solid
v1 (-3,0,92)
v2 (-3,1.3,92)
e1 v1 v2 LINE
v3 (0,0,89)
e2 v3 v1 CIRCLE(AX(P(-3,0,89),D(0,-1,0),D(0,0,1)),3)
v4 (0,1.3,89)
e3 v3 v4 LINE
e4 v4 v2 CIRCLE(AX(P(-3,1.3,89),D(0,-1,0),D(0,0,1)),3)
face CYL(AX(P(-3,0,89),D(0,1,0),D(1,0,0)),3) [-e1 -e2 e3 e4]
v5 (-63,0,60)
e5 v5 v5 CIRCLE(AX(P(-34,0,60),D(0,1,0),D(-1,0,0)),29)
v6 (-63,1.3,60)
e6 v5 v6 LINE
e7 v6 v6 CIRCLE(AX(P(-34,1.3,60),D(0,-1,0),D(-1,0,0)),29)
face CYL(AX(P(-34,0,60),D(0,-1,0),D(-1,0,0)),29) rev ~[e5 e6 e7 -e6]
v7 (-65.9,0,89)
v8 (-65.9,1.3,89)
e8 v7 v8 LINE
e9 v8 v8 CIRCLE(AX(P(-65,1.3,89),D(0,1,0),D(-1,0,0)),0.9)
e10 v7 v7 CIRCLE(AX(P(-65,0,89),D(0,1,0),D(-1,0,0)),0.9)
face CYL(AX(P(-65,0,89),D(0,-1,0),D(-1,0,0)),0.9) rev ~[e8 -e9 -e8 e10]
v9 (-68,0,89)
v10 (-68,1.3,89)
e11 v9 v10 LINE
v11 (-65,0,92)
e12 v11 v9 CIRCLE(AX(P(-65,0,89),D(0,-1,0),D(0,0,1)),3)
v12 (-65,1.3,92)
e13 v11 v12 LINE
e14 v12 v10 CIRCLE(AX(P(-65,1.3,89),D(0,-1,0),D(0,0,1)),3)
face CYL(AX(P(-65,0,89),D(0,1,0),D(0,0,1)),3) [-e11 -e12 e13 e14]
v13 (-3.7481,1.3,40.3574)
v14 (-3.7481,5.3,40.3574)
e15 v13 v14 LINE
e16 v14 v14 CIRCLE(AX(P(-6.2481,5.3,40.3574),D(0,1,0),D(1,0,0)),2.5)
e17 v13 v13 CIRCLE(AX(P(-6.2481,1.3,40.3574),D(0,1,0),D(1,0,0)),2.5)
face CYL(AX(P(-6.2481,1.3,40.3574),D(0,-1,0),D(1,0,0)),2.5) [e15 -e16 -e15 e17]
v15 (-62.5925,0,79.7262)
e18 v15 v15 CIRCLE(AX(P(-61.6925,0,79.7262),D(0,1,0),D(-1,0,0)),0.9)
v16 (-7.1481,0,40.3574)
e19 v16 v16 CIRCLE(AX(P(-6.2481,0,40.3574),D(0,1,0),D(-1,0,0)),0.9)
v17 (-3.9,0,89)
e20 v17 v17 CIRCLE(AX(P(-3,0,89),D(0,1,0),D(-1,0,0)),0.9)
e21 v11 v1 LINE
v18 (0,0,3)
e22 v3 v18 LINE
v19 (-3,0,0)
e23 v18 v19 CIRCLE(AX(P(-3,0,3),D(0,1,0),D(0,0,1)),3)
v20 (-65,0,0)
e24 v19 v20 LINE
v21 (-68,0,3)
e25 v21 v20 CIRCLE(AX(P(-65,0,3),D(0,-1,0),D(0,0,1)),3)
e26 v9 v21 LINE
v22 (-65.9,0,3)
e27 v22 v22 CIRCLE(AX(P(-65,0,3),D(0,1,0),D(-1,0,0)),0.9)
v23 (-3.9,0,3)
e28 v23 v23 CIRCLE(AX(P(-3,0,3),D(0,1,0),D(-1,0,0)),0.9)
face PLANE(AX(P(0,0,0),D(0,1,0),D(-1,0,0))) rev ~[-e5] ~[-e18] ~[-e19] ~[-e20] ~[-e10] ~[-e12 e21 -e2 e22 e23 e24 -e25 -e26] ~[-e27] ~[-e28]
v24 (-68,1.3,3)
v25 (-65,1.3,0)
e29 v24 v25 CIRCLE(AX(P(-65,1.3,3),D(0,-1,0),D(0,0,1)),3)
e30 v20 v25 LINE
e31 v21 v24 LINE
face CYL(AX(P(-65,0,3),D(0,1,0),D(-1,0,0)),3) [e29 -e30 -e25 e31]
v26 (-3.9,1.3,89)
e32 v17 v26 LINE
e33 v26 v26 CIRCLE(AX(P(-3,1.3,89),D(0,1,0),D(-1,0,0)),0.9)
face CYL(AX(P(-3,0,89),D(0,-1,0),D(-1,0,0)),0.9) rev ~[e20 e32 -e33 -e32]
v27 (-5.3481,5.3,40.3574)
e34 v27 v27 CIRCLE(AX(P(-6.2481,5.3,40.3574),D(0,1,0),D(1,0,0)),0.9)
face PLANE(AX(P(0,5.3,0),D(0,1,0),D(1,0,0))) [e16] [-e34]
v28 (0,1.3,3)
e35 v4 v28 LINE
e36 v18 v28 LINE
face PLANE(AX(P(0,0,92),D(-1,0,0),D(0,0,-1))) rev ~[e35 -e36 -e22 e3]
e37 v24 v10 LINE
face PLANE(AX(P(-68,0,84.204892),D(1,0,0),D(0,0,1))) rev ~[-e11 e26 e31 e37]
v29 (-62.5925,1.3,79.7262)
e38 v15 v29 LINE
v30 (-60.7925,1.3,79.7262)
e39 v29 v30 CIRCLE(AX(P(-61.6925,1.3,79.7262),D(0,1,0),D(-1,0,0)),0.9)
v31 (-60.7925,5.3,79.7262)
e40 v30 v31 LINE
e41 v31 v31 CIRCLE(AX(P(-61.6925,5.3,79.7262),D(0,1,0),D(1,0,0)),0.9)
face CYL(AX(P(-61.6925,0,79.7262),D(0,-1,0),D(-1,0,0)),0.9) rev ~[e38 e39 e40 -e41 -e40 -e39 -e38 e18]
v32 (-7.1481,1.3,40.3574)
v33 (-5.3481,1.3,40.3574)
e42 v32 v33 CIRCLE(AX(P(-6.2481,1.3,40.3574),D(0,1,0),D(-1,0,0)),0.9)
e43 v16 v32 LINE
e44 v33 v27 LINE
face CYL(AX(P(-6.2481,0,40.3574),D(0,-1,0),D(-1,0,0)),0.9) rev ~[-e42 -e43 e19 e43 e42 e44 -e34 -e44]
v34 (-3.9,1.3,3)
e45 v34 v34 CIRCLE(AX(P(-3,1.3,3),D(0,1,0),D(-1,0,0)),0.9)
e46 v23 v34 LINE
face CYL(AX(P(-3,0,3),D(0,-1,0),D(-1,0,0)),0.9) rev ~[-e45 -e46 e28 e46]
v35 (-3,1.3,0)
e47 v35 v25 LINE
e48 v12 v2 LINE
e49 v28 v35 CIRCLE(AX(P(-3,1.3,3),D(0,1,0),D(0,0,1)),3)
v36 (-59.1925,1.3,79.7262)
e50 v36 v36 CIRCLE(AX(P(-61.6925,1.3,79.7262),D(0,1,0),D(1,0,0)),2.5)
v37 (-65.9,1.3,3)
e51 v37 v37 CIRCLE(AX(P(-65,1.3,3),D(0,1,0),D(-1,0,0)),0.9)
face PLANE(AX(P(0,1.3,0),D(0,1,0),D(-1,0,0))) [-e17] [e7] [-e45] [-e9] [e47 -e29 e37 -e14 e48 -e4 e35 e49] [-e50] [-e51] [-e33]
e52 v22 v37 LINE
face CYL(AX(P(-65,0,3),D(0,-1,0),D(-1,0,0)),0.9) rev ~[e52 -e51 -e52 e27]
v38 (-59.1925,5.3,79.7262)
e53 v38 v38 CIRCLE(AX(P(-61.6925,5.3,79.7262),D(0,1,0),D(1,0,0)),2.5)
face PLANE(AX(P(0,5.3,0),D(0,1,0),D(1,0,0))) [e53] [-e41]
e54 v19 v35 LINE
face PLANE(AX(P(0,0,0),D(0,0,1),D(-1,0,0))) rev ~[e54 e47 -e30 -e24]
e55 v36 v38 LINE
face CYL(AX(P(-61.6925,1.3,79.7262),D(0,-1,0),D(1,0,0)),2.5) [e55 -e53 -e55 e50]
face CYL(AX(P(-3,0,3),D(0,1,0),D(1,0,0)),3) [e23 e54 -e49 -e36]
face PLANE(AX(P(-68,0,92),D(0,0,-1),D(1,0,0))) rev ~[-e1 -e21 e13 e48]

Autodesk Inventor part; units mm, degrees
ref_plane "YZ Plane" through (0, 0, 0) normal (1, 0, 0) x (0, 1, 0)
ref_plane "XZ Plane" through (0, 0, 0) normal (0, 1, 0) x (-1, 0, 0)
ref_plane "XY Plane" through (0, 0, 0) normal (0, 0, 1) x (1, 0, 0)
sketch "スケッチ1" plane through (0, 0, 0) normal (0, 1, 0) x (-1, 0, 0)
  line L0 (0, 0) -> (68, 0)
  line L1 (68, 0) -> (68, 92)
  line L2 (68, 92) -> (0, 92)
  line L3 (0, 92) -> (0, 0)
  circle A0 centre (3, 89) radius 0.9
  circle A1 centre (3, 3) radius 0.9
  circle A2 centre (65, 3) radius 0.9
  circle A3 centre (65, 89) radius 0.9
  circle A4 centre (34, 60) radius 29
  circle A5 centre (61.6925, 79.7262) radius 0.9
  circle A6 centre (6.2481, 40.3574) radius 0.9
  line L4 (6.2481, 40.3574) -> (71.1751, 86.4594)
  dimension "d0" = 92
  dimension "d1" = 68
  dimension "d2" = 3
  dimension "d3" = 3
  dimension "d4" = 1.8
  dimension "d5" = 1.8
  dimension "d6" = 3
  dimension "d7" = 3
  dimension "d8" = 1.8
  dimension "d9" = 3
  dimension "d10" = 3
  dimension "d11" = 3
  dimension "d12" = 3
  dimension "d13" = 1.8
  dimension "d17" = 58
  dimension "d18" = 32
  dimension "d19" = 34
  dimension "d20" = 1.8
  dimension "d21" = 1.8
  dimension "d24" = 34
  dimension "d25" = 34
extrude "押し出し1" add sketch "スケッチ1" along normal blind 1.3
fillet "フィレット1" radius 3 4 edges at (0, 0.65, 92) (0, 0.65, 0) (-68, 0.65, 0) (-68, 0.65, 92)
sketch "スケッチ2" plane through (0, 1.3, 0) normal (0, 1, 0) x (1, 0, 0)
  circle A0 centre (-6.2481, -40.3574) radius 0.9 projected
  circle A1 centre (-61.6925, -79.7262) radius 0.9 projected
  circle A2 centre (-6.2481, -40.3574) radius 2.5
  circle A3 centre (-61.6925, -79.7262) radius 2.5
  point P0 (0, 0)
  dimension "d26" = 5
  dimension "d27" = 5
extrude "押し出し2" add sketch "スケッチ2" along normal blind 4
sketch "スケッチ3" plane through (0, 1.3, 0) normal (0, 1, 0) x (1, 0, 0)
  line L0 (-45.9767, -23.6507) -> (-43.3974, -22.1186)
  line L1 (-43.3974, -22.1186) -> (-39.3119, -28.9967)
  line L2 (-39.3119, -28.9967) -> (-41.8911, -30.5288)
  line L3 (-41.8911, -30.5288) -> (-45.9767, -23.6507)
  line L4 (-63, -33.7624) -> (-60.4207, -32.2303)
  line L5 (-60.4207, -32.2303) -> (-56.3352, -39.1084)
  line L6 (-56.3352, -39.1084) -> (-58.9145, -40.6405)
  line L7 (-58.9145, -40.6405) -> (-63, -33.7624)
  point P0 (0, 0)
  dimension "d31" = 8
  dimension "d32" = 8
  dimension "d33" = 3
  dimension "d34" = 3
  dimension "d35" = 0
  dimension "d46" = 22.8
extrude "押し出し3" [suppressed]
sketch "スケッチ6" plane through (0, 1.3, 0) normal (0, 1, 0) x (1, 0, 0)
  line L0 (-43.3974, -22.1186) -> (-39.3119, -28.9967) projected
  line L1 (-58.9145, -40.6405) -> (-63, -33.7624) projected
  line L2 (-58.9145, -40.6405) -> (-63, -33.7624)
  line L3 (-63, -33.7624) -> (-64.7195, -34.7838)
  line L4 (-64.7195, -34.7838) -> (-60.634, -41.6619)
  line L5 (-60.634, -41.6619) -> (-58.9145, -40.6405)
  line L6 (-39.3119, -28.9967) -> (-43.3974, -22.1186)
  line L7 (-43.3974, -22.1186) -> (-41.6779, -21.0972)
  line L8 (-41.6779, -21.0972) -> (-37.5923, -27.9753)
  line L9 (-37.5923, -27.9753) -> (-39.3119, -28.9967)
  line L10 (-64.0424, -28.8936) -> (-47.7828, -19.2356)
  line L11 (-47.7828, -19.2356) -> (-47.0244, -20.5124)
  line L12 (-47.0244, -20.5124) -> (-63.284, -30.1705)
  line L13 (-63.284, -30.1705) -> (-64.0424, -28.8936)
  point P0 (0, 0)
  dimension "d47" = 2
  dimension "d48" = 2
extrude "押し出し6" [suppressed]
sketch "スケッチ7" plane through (0, 4.8, 0) normal (0, 1, 0) x (1, 0, 0)
  line L0 (-58.9145, -40.6405) -> (-63, -33.7624) projected
  line L1 (-64.7195, -34.7838) -> (-60.634, -41.6619) projected
  line L2 (-43.3974, -22.1186) -> (-39.3119, -28.9967) projected
  line L3 (-39.3119, -28.9967) -> (-37.5923, -27.9753) projected
  line L4 (-37.5923, -27.9753) -> (-41.6779, -21.0972) projected
  line L5 (-41.6779, -21.0972) -> (-43.3974, -22.1186) projected
  line L6 (-64.7195, -34.7838) -> (-60.634, -41.6619)
  line L7 (-60.634, -41.6619) -> (-58.0547, -40.1298)
  line L8 (-58.0547, -40.1298) -> (-62.1402, -33.2517)
  line L9 (-62.1402, -33.2517) -> (-64.7195, -34.7838)
  line L10 (-41.6779, -21.0972) -> (-37.5461, -28.0532)
  line L11 (-37.5461, -28.0532) -> (-40.1254, -29.5852)
  line L12 (-40.1254, -29.5852) -> (-44.2572, -22.6293)
  line L13 (-44.2572, -22.6293) -> (-41.6779, -21.0972)
  point P0 (0, 0)
  dimension "d51" = 3
  dimension "d52" = 3
extrude "押し出し7" [suppressed]
equation "\"d3\" = d2"
equation "\"d5\" = d4"
equation "\"d6\" = d3"
equation "\"d7\" = d3"
equation "\"d8\" = d4"
equation "\"d9\" = d2"
equation "\"d10\" = d2"
equation "\"d11\" = d2"
equation "\"d12\" = d2"
equation "\"d13\" = d4"
equation "\"d19\" = 0.5 * d1"
equation "\"d21\" = d20"
equation "\"d25\" = d24"
equation "\"d27\" = d26"
equation "\"d32\" = d31"
equation "\"d34\" = d33"
equation "\"d48\" = d47"
equation "\"d52\" = d51"
properties part number "raspi-holder-top"
